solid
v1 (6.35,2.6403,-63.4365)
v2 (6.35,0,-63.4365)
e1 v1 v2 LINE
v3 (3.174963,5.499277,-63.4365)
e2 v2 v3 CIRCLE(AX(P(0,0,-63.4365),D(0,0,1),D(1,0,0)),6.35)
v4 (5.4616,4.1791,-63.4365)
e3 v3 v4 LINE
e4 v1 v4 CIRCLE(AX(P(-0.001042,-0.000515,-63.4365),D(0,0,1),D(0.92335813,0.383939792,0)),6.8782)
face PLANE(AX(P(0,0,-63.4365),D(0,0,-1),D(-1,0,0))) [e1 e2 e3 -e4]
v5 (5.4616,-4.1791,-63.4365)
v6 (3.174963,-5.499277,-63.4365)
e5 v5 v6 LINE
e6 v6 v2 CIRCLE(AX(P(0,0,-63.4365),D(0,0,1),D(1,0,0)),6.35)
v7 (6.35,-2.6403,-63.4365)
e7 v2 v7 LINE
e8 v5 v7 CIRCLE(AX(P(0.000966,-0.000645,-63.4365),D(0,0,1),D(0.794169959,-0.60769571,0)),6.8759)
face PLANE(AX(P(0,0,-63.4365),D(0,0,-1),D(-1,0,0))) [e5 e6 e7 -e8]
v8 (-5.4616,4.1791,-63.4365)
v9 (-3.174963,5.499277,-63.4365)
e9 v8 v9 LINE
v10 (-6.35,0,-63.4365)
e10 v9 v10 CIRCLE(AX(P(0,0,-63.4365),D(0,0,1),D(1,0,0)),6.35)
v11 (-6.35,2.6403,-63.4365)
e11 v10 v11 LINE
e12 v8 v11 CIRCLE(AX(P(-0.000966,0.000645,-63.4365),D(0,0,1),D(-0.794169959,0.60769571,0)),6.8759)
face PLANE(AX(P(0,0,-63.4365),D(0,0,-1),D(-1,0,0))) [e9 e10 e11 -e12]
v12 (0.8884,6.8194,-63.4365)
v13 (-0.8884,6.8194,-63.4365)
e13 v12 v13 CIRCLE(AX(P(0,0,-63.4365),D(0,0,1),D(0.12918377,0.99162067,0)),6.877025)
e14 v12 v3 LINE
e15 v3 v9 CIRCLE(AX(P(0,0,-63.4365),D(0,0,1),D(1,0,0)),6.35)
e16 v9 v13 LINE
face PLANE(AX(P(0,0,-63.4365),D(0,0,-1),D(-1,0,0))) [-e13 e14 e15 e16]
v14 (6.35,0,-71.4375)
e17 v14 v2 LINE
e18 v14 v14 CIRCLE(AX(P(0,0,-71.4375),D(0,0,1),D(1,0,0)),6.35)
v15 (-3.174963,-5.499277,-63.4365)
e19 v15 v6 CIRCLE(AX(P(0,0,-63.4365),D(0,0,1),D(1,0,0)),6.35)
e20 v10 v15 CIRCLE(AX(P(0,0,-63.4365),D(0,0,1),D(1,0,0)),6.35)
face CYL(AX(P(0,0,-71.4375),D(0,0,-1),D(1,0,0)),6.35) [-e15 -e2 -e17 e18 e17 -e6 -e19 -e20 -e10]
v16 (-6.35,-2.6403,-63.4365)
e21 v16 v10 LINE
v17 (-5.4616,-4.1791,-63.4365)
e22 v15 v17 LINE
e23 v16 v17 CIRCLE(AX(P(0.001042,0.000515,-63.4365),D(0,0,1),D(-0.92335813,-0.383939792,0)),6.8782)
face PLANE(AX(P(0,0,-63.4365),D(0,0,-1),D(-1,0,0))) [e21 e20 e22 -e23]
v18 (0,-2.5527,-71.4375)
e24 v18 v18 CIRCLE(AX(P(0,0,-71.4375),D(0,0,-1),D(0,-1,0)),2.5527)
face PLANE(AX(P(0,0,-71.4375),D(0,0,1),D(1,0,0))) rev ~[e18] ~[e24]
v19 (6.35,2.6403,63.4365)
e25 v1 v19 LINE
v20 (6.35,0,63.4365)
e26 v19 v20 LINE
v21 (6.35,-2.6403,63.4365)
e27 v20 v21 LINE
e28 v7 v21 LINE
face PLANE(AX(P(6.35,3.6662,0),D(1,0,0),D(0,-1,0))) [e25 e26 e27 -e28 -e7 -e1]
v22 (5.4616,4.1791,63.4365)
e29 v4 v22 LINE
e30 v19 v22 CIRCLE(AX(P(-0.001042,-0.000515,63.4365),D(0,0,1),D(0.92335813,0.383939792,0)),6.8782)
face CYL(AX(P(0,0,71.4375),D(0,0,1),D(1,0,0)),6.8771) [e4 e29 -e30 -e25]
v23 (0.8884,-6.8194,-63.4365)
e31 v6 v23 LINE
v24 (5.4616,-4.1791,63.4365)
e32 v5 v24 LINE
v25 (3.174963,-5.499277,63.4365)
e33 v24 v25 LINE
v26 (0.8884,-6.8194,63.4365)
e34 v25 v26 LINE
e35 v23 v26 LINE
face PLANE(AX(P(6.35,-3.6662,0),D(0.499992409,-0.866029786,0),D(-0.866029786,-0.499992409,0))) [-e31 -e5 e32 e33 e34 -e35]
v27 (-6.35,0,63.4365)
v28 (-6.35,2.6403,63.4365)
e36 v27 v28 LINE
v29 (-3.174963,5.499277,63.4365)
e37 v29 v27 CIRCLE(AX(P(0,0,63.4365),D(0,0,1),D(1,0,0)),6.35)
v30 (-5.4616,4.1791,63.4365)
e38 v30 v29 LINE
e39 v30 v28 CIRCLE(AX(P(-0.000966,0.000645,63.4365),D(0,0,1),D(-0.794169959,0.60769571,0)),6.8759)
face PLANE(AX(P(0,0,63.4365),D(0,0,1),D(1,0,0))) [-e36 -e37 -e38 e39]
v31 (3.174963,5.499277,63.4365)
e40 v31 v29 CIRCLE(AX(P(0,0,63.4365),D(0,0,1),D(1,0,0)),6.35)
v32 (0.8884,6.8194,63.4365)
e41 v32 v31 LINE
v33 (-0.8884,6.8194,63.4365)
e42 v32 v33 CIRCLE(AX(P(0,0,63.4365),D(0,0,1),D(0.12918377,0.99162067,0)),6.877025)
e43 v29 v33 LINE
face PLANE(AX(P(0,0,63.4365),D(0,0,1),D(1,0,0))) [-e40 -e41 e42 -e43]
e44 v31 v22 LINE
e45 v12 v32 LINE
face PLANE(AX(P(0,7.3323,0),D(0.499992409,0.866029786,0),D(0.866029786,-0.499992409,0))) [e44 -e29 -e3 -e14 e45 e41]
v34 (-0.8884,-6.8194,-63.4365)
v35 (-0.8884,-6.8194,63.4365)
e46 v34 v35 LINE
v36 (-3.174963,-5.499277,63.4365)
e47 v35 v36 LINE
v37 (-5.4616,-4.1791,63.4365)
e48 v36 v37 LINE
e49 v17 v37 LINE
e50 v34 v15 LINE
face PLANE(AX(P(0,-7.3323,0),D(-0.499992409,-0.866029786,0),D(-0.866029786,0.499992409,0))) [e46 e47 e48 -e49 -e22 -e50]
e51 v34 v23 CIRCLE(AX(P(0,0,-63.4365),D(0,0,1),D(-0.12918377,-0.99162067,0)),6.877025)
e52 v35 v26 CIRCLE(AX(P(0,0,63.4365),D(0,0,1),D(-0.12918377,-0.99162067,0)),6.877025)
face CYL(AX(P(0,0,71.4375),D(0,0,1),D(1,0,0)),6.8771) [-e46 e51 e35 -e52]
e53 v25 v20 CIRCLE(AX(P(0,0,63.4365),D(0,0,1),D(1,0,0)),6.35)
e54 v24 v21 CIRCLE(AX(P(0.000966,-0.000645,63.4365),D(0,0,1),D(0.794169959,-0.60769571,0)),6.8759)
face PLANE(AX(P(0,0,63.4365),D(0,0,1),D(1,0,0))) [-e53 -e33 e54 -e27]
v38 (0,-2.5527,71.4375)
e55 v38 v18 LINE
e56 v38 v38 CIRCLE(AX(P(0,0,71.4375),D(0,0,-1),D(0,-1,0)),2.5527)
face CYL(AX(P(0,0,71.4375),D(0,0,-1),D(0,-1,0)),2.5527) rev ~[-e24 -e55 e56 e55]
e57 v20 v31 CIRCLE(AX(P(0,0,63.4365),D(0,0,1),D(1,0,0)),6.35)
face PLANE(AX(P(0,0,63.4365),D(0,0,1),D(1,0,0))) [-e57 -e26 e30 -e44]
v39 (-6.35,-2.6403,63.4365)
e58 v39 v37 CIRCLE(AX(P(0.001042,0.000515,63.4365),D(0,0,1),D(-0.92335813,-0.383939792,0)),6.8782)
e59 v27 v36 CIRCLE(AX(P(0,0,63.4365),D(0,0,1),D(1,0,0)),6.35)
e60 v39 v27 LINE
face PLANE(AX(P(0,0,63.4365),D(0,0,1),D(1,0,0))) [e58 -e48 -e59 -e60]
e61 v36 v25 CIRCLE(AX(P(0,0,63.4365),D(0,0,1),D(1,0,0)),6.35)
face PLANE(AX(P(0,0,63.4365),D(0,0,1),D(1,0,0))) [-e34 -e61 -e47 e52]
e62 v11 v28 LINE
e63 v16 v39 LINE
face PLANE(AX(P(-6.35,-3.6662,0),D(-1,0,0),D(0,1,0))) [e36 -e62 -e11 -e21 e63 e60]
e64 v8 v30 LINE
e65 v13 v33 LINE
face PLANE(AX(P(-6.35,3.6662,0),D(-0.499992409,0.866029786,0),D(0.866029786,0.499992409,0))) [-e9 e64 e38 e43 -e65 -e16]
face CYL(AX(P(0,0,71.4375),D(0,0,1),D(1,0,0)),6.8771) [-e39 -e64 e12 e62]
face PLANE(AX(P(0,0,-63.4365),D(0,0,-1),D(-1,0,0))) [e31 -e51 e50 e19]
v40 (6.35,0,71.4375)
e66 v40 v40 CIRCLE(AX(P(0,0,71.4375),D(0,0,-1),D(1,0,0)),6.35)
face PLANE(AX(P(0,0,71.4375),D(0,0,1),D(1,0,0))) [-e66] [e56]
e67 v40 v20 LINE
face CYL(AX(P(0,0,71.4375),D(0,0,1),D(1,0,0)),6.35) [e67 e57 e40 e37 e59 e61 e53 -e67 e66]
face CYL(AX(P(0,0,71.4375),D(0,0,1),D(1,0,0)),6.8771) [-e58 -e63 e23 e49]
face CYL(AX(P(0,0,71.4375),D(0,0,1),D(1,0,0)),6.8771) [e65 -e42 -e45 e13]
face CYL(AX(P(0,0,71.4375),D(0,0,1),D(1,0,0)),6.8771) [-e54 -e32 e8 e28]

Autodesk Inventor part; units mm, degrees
ref_plane "YZ Plane" through (0, 0, 0) normal (1, 0, 0) x (0, 1, 0)
ref_plane "XZ Plane" through (0, 0, 0) normal (0, 1, 0) x (-1, 0, 0)
ref_plane "XY Plane" through (0, 0, 0) normal (0, 0, 1) x (1, 0, 0)
sketch "Sketch1" plane through (0, 0, 0) normal (0, 0, 1) x (1, 0, 0)
  line L0 (-6.35, -3.6662) -> (-6.35, 3.6662)
  line L1 (-6.35, 3.6662) -> (0, 7.3323)
  line L2 (0, 7.3323) -> (6.35, 3.6662)
  line L3 (6.35, 3.6662) -> (6.35, -3.6662)
  line L4 (6.35, -3.6662) -> (0, -7.3323)
  line L5 (0, -7.3323) -> (-6.35, -3.6662)
  point P0 (0, 0)
  point P1 (0, 0)
  dimension "Size" = 12.7
extrude "Extrusion1" add sketch "Sketch1" along normal mid plane 142.875
sketch "Sketch3" plane through (0, 0, 71.4375) normal (0, 0, 1) x (1, 0, 0)
  line L0 (-6.35, 3.6662) -> (0, 7.3323) construction
  line L1 (0, 7.3323) -> (6.35, 3.6662) construction
  line L2 (6.35, 3.6662) -> (6.35, -3.6662) construction
  line L3 (6.35, -3.6662) -> (0, -7.3323) construction
  line L4 (0, -7.3323) -> (-6.35, -3.6662) construction
  line L5 (-6.35, -3.6662) -> (-6.35, 3.6662) construction
  point P0 (0, 0)
hole "Hole1" at (0, 0, 71.4375) direction (0, 0, -1) diameter 5.1054 end through all
sketch "Sketch4" plane through (0, 0, 71.4375) normal (0, 0, 1) x (1, 0, 0)
  circle A0 centre (0, 0) radius 2.5527 construction
  line L0 (-6.35, 3.6662) -> (0, 7.3323) construction
  line L1 (0, 7.3323) -> (6.35, 3.6662) construction
  line L2 (6.35, 3.6662) -> (6.35, -3.6662) construction
  line L3 (6.35, -3.6662) -> (0, -7.3323) construction
  line L4 (0, -7.3323) -> (-6.35, -3.6662) construction
  line L5 (-6.35, -3.6662) -> (-6.35, 3.6662) construction
  circle A1 centre (0, 0) radius 6.8771
  circle A2 centre (0, 0) radius 8.89
  dimension "thunder" = 13.7541
  dimension "d16" = 17.78
extrude "Extrusion3" cut sketch "Sketch4" against normal through all
sketch "Sketch5" plane through (0, 0, 71.4375) normal (0, 0, 1) x (1, 0, 0)
  arc A0 (5.4616, -4.1791) -> (6.35, -2.6403) centre (0, 0) ccw projected
  line L0 (5.4616, -4.1791) -> (0.8884, -6.8194) projected
  arc A1 (-0.8884, -6.8194) -> (0.8884, -6.8194) centre (0, 0) ccw projected
  line L1 (-0.8884, -6.8194) -> (-5.4616, -4.1791) projected
  arc A2 (-6.35, -2.6403) -> (-5.4616, -4.1791) centre (0, 0) ccw projected
  line L2 (-6.35, -2.6403) -> (-6.35, 2.6403) projected
  arc A3 (-5.4616, 4.1791) -> (-6.35, 2.6403) centre (0, 0) ccw projected
  line L3 (-5.4616, 4.1791) -> (-0.8884, 6.8194) projected
  arc A4 (0.8884, 6.8194) -> (-0.8884, 6.8194) centre (0, 0) ccw projected
  line L4 (0.8884, 6.8194) -> (5.4616, 4.1791) projected
  arc A5 (6.35, 2.6403) -> (5.4616, 4.1791) centre (0, 0) ccw projected
  line L5 (6.35, 2.6403) -> (6.35, -2.6403) projected
  circle A6 centre (0, 0) radius 2.5527 projected
  circle A7 centre (0, 0) radius 6.35
  point P0 (-3.175, 5.4993)
  point P1 (3.175, 5.4993)
  point P2 (6.35, 0)
  point P3 (-6.35, 0)
  point P4 (-3.175, -5.4993)
  point P5 (3.175, -5.4993)
  dimension "d19" = 12.7
extrude "Extrusion4" cut sketch "Sketch5" against normal blind 8.001 contours L0 A7 L5 A0 | L0 A1 L1 A7 | A7 L4 A5 L5 | L1 A2 L2 A7 | A7 L3 A4 L4 | L2 A3 L3 A7
mirror "Mirror2" about plane through (0, 0, 0) normal (0, 0, 1) of "Extrusion4"
equation "\"bearing\" = 25.4"
properties part number "CL4-018" material "Aluminum 6061"
